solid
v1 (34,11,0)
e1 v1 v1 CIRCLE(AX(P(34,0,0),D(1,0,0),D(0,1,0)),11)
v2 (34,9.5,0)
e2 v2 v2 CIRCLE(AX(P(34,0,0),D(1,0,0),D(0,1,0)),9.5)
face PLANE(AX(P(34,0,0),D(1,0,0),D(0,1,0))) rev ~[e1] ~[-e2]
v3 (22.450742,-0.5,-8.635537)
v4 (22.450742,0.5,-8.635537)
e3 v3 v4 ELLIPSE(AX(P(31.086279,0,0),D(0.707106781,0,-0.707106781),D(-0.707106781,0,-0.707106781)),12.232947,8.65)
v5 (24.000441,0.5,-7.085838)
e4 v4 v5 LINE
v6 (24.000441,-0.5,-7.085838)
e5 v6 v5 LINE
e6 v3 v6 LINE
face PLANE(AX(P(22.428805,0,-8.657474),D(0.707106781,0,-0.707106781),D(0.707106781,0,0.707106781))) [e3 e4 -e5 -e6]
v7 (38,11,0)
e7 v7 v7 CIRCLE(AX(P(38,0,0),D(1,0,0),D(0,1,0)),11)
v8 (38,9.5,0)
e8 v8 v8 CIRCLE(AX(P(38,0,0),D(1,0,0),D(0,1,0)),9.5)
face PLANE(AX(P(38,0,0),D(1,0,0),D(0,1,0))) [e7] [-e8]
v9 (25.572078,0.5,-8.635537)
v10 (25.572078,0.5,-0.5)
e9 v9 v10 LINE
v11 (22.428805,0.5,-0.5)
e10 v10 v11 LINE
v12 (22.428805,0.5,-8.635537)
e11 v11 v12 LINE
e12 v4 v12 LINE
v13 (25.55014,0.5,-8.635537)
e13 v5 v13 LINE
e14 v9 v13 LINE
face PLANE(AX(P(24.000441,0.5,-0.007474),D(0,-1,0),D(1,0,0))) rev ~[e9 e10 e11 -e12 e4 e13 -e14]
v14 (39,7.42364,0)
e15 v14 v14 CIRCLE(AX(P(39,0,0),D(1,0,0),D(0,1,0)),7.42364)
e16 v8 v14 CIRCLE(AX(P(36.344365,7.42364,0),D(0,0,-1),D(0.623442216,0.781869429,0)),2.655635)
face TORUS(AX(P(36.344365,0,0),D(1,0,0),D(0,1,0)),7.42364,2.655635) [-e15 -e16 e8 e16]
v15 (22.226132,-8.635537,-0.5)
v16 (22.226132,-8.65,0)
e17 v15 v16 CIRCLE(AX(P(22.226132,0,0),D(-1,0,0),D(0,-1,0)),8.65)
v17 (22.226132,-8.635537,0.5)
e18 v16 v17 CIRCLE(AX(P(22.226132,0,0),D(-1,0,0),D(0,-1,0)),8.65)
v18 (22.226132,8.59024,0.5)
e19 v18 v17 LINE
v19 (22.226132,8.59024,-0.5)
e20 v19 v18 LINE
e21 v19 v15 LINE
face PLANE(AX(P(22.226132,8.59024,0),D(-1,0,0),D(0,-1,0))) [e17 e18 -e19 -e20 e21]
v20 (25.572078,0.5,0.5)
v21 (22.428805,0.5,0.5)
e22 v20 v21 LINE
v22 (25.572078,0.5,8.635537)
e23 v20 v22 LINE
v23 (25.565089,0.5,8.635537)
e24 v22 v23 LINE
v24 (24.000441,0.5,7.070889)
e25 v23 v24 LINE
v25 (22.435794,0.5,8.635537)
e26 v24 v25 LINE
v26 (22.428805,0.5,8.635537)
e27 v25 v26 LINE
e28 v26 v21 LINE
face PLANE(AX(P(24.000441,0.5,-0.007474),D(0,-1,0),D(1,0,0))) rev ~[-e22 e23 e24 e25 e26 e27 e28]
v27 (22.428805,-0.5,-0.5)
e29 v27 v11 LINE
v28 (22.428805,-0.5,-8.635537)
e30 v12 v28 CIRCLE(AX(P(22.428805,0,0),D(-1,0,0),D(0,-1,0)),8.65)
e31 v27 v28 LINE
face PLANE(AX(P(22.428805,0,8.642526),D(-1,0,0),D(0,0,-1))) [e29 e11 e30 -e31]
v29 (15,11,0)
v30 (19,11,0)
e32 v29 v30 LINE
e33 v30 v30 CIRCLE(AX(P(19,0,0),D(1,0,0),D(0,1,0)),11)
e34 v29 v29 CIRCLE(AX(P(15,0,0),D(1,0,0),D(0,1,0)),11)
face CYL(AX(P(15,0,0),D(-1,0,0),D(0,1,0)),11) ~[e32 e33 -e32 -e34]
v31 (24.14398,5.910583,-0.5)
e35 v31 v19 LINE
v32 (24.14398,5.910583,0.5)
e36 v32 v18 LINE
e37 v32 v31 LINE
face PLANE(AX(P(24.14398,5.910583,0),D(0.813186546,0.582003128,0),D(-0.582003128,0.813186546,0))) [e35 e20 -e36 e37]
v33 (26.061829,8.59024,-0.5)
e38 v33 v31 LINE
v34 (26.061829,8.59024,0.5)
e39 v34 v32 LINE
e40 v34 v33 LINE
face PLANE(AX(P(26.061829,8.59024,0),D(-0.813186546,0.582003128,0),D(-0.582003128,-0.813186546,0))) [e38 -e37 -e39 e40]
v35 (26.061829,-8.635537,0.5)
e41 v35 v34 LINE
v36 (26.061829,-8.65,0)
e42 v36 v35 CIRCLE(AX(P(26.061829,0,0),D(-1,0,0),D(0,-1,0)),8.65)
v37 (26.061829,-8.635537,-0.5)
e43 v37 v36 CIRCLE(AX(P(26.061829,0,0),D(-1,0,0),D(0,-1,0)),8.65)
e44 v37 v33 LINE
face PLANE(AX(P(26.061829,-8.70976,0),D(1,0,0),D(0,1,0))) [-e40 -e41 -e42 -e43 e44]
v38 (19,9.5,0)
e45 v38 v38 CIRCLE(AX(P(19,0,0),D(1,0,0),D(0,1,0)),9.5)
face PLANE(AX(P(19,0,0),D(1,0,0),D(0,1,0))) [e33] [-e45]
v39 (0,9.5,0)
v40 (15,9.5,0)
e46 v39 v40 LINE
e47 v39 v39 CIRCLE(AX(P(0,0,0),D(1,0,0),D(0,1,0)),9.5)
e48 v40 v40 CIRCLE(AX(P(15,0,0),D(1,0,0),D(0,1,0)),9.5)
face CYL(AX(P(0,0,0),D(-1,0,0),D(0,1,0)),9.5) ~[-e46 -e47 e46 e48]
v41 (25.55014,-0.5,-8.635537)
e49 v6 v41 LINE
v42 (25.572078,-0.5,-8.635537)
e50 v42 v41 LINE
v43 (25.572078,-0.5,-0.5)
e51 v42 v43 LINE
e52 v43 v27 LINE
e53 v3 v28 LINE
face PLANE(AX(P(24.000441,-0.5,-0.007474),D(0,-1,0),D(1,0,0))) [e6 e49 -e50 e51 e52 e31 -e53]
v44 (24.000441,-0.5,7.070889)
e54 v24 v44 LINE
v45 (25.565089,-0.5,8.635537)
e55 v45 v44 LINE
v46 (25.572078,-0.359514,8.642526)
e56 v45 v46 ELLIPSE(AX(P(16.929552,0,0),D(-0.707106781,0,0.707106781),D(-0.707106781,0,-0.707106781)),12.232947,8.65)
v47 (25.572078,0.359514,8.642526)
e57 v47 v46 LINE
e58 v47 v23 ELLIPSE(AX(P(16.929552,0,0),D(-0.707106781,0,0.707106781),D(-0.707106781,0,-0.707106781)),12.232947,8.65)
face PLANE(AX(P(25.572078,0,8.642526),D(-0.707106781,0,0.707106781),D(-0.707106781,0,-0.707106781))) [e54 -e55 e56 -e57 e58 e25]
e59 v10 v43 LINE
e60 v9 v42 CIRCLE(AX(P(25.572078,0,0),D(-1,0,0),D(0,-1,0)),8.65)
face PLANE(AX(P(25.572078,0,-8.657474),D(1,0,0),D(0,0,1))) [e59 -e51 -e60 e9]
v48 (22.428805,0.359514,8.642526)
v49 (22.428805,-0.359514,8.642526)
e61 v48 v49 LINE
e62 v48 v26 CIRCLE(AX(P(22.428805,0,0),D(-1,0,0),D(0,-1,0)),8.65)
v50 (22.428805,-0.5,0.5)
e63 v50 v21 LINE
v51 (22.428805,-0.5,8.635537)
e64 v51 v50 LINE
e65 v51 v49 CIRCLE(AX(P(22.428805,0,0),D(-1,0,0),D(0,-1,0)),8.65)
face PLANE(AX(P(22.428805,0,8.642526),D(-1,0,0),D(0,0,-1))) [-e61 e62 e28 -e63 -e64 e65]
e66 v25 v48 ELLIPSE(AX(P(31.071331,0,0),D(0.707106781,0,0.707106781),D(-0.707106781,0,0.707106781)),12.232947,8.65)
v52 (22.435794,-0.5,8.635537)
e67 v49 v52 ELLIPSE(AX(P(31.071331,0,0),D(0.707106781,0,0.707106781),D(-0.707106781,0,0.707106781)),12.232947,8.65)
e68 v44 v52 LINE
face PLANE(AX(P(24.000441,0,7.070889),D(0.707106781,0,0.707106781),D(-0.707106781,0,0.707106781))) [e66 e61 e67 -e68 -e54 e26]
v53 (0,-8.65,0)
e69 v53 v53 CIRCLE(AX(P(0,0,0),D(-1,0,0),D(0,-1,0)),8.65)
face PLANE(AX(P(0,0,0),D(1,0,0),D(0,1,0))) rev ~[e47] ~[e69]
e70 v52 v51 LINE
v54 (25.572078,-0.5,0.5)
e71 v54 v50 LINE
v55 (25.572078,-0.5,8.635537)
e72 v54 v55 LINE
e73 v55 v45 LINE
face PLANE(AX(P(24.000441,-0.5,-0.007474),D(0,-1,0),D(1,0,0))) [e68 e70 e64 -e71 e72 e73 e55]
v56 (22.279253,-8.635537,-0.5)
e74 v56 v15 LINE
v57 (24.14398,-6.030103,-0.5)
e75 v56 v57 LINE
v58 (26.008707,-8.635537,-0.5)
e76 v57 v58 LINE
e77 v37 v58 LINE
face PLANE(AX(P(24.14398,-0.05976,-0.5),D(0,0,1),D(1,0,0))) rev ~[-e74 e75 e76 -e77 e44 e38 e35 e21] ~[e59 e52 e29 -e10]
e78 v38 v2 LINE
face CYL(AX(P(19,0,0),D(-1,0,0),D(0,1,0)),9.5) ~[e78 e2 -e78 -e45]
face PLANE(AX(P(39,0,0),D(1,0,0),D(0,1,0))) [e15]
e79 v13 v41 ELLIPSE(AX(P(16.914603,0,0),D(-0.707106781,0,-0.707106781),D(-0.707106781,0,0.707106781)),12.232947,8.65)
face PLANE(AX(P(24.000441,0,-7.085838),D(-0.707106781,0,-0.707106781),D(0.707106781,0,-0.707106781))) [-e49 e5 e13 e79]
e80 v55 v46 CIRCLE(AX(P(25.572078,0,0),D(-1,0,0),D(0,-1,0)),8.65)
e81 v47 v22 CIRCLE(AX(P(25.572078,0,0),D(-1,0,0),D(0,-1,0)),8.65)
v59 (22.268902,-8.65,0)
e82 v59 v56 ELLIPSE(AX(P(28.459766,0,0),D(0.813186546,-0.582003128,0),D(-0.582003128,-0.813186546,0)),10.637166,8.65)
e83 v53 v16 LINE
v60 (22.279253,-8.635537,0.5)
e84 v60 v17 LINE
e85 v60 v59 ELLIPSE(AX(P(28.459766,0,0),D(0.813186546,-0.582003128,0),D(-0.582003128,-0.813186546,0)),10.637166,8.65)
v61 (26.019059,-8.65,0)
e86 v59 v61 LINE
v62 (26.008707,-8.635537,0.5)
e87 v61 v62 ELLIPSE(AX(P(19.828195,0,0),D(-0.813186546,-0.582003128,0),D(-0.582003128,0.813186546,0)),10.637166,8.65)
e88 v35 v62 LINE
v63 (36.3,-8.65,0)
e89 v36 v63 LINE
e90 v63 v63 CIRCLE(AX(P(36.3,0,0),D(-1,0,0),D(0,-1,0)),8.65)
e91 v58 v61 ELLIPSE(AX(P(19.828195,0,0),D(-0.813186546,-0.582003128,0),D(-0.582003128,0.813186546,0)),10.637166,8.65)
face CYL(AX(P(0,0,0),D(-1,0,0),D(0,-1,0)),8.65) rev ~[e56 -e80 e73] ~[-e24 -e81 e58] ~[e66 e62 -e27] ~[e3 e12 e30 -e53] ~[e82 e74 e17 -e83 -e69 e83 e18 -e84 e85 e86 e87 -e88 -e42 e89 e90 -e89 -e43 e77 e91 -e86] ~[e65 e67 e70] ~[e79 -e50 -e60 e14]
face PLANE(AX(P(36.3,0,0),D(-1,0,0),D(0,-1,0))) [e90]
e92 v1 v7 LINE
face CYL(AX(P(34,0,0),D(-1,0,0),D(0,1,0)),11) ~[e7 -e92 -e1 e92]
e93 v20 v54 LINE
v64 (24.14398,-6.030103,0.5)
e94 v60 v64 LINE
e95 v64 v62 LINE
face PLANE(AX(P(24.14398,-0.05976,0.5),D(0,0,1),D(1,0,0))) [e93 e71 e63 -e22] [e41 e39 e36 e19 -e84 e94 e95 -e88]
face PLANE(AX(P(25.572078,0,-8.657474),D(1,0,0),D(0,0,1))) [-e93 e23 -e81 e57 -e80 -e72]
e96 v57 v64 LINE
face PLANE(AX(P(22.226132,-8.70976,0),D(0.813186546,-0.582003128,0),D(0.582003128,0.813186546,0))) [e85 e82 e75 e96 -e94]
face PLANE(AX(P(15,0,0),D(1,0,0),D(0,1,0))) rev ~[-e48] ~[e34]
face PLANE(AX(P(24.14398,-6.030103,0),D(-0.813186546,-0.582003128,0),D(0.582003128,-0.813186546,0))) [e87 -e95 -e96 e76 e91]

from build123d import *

# Parameters (mm, degrees)
F0_R      = 9.5
F1_DEPTH  = 15
F2_R      = 11
F3_DEPTH  = 4
F4_R      = 9.5
F5_DEPTH  = 15
F6_R      = 11
F7_DEPTH  = 4
F8_R      = 9.5
F9_DEPTH  = 1
F11_R     = 8.65
F12_DEPTH = 36.3
F15_DEPTH = 0.5
F16_DEPTH = 0.5


# Not quite as in the source:
# - a fillet or chamfer that OpenCascade refuses, or shapes differently, is made with other operations: its cross-section is extruded or revolved along the edge and cut away or added


with BuildPart() as f1:
    # F0 (on Right) → F1 (new body)
    with BuildSketch(Plane.YZ):
        Circle(F0_R)
    extrude(amount=F1_DEPTH)

    # F2 (on face) → F3 (join)
    with BuildSketch(Plane.YZ.offset(15)):
        Circle(F2_R)
    extrude(amount=F3_DEPTH)

    # F4 (on face) → F5 (join)
    with BuildSketch(Plane.YZ.offset(19)):
        Circle(F4_R)
    extrude(amount=F5_DEPTH)

    # F6 (on face) → F7 (join)
    with BuildSketch(Plane.YZ.offset(34)):
        Circle(F6_R)
    extrude(amount=F7_DEPTH)

    # F8 (on face) → F9 (join)
    with BuildSketch(Plane.YZ.offset(38)):
        Circle(F8_R)
    extrude(amount=F9_DEPTH)

    # F10: fillet of radius 2.6556349186 on 1 edges, made by hand

    # F10_s1 → F10_t2 (revolve, cut)
    with BuildSketch(Plane.XY):
        with BuildLine():
            ThreePointArc((38, 9.5), (38.7369744021, 8.5759498633), (39, 7.4236402438))
            Line((39, 7.4236402438), (39, 9.5))
            Line((39, 9.5), (38, 9.5))
        make_face()
    revolve(axis=Axis((39, 0, 0), (1, 0, 0)), mode=Mode.SUBTRACT)

    # F11 (on face) → F12 (cut)
    with BuildSketch(Plane(origin=(0, 0, 0), x_dir=(0, -1, 0), z_dir=(-1, 0, 0))):
        Circle(F11_R)
    extrude(amount=-F12_DEPTH, mode=Mode.SUBTRACT)

    # F14 (on Front) → F15 (join, symmetric)
    with BuildSketch(Plane.XZ):
        Polygon((25.5720777049, -8.6574743293), (25.5720777049, 8.6425256707), (24.0004413285, 7.0708892943), (22.4288049522, 8.6425256707), (22.4288049522, -8.6574743293), (24.0004413285, -7.085837953), align=None)
    extrude(amount=F15_DEPTH, both=True)

    # F13 (on Top) → F16 (join, symmetric)
    with BuildSketch(Plane.XY):
        Polygon((24.1439803634, 5.9105833968), (22.2261317603, 8.5902402711), (22.2261317603, -8.7097597289), (24.1439803634, -6.0301028546), (26.0618289666, -8.7097597289), (26.0618289666, 8.5902402711), align=None)
    extrude(amount=F16_DEPTH, both=True)


solid = f1.part
